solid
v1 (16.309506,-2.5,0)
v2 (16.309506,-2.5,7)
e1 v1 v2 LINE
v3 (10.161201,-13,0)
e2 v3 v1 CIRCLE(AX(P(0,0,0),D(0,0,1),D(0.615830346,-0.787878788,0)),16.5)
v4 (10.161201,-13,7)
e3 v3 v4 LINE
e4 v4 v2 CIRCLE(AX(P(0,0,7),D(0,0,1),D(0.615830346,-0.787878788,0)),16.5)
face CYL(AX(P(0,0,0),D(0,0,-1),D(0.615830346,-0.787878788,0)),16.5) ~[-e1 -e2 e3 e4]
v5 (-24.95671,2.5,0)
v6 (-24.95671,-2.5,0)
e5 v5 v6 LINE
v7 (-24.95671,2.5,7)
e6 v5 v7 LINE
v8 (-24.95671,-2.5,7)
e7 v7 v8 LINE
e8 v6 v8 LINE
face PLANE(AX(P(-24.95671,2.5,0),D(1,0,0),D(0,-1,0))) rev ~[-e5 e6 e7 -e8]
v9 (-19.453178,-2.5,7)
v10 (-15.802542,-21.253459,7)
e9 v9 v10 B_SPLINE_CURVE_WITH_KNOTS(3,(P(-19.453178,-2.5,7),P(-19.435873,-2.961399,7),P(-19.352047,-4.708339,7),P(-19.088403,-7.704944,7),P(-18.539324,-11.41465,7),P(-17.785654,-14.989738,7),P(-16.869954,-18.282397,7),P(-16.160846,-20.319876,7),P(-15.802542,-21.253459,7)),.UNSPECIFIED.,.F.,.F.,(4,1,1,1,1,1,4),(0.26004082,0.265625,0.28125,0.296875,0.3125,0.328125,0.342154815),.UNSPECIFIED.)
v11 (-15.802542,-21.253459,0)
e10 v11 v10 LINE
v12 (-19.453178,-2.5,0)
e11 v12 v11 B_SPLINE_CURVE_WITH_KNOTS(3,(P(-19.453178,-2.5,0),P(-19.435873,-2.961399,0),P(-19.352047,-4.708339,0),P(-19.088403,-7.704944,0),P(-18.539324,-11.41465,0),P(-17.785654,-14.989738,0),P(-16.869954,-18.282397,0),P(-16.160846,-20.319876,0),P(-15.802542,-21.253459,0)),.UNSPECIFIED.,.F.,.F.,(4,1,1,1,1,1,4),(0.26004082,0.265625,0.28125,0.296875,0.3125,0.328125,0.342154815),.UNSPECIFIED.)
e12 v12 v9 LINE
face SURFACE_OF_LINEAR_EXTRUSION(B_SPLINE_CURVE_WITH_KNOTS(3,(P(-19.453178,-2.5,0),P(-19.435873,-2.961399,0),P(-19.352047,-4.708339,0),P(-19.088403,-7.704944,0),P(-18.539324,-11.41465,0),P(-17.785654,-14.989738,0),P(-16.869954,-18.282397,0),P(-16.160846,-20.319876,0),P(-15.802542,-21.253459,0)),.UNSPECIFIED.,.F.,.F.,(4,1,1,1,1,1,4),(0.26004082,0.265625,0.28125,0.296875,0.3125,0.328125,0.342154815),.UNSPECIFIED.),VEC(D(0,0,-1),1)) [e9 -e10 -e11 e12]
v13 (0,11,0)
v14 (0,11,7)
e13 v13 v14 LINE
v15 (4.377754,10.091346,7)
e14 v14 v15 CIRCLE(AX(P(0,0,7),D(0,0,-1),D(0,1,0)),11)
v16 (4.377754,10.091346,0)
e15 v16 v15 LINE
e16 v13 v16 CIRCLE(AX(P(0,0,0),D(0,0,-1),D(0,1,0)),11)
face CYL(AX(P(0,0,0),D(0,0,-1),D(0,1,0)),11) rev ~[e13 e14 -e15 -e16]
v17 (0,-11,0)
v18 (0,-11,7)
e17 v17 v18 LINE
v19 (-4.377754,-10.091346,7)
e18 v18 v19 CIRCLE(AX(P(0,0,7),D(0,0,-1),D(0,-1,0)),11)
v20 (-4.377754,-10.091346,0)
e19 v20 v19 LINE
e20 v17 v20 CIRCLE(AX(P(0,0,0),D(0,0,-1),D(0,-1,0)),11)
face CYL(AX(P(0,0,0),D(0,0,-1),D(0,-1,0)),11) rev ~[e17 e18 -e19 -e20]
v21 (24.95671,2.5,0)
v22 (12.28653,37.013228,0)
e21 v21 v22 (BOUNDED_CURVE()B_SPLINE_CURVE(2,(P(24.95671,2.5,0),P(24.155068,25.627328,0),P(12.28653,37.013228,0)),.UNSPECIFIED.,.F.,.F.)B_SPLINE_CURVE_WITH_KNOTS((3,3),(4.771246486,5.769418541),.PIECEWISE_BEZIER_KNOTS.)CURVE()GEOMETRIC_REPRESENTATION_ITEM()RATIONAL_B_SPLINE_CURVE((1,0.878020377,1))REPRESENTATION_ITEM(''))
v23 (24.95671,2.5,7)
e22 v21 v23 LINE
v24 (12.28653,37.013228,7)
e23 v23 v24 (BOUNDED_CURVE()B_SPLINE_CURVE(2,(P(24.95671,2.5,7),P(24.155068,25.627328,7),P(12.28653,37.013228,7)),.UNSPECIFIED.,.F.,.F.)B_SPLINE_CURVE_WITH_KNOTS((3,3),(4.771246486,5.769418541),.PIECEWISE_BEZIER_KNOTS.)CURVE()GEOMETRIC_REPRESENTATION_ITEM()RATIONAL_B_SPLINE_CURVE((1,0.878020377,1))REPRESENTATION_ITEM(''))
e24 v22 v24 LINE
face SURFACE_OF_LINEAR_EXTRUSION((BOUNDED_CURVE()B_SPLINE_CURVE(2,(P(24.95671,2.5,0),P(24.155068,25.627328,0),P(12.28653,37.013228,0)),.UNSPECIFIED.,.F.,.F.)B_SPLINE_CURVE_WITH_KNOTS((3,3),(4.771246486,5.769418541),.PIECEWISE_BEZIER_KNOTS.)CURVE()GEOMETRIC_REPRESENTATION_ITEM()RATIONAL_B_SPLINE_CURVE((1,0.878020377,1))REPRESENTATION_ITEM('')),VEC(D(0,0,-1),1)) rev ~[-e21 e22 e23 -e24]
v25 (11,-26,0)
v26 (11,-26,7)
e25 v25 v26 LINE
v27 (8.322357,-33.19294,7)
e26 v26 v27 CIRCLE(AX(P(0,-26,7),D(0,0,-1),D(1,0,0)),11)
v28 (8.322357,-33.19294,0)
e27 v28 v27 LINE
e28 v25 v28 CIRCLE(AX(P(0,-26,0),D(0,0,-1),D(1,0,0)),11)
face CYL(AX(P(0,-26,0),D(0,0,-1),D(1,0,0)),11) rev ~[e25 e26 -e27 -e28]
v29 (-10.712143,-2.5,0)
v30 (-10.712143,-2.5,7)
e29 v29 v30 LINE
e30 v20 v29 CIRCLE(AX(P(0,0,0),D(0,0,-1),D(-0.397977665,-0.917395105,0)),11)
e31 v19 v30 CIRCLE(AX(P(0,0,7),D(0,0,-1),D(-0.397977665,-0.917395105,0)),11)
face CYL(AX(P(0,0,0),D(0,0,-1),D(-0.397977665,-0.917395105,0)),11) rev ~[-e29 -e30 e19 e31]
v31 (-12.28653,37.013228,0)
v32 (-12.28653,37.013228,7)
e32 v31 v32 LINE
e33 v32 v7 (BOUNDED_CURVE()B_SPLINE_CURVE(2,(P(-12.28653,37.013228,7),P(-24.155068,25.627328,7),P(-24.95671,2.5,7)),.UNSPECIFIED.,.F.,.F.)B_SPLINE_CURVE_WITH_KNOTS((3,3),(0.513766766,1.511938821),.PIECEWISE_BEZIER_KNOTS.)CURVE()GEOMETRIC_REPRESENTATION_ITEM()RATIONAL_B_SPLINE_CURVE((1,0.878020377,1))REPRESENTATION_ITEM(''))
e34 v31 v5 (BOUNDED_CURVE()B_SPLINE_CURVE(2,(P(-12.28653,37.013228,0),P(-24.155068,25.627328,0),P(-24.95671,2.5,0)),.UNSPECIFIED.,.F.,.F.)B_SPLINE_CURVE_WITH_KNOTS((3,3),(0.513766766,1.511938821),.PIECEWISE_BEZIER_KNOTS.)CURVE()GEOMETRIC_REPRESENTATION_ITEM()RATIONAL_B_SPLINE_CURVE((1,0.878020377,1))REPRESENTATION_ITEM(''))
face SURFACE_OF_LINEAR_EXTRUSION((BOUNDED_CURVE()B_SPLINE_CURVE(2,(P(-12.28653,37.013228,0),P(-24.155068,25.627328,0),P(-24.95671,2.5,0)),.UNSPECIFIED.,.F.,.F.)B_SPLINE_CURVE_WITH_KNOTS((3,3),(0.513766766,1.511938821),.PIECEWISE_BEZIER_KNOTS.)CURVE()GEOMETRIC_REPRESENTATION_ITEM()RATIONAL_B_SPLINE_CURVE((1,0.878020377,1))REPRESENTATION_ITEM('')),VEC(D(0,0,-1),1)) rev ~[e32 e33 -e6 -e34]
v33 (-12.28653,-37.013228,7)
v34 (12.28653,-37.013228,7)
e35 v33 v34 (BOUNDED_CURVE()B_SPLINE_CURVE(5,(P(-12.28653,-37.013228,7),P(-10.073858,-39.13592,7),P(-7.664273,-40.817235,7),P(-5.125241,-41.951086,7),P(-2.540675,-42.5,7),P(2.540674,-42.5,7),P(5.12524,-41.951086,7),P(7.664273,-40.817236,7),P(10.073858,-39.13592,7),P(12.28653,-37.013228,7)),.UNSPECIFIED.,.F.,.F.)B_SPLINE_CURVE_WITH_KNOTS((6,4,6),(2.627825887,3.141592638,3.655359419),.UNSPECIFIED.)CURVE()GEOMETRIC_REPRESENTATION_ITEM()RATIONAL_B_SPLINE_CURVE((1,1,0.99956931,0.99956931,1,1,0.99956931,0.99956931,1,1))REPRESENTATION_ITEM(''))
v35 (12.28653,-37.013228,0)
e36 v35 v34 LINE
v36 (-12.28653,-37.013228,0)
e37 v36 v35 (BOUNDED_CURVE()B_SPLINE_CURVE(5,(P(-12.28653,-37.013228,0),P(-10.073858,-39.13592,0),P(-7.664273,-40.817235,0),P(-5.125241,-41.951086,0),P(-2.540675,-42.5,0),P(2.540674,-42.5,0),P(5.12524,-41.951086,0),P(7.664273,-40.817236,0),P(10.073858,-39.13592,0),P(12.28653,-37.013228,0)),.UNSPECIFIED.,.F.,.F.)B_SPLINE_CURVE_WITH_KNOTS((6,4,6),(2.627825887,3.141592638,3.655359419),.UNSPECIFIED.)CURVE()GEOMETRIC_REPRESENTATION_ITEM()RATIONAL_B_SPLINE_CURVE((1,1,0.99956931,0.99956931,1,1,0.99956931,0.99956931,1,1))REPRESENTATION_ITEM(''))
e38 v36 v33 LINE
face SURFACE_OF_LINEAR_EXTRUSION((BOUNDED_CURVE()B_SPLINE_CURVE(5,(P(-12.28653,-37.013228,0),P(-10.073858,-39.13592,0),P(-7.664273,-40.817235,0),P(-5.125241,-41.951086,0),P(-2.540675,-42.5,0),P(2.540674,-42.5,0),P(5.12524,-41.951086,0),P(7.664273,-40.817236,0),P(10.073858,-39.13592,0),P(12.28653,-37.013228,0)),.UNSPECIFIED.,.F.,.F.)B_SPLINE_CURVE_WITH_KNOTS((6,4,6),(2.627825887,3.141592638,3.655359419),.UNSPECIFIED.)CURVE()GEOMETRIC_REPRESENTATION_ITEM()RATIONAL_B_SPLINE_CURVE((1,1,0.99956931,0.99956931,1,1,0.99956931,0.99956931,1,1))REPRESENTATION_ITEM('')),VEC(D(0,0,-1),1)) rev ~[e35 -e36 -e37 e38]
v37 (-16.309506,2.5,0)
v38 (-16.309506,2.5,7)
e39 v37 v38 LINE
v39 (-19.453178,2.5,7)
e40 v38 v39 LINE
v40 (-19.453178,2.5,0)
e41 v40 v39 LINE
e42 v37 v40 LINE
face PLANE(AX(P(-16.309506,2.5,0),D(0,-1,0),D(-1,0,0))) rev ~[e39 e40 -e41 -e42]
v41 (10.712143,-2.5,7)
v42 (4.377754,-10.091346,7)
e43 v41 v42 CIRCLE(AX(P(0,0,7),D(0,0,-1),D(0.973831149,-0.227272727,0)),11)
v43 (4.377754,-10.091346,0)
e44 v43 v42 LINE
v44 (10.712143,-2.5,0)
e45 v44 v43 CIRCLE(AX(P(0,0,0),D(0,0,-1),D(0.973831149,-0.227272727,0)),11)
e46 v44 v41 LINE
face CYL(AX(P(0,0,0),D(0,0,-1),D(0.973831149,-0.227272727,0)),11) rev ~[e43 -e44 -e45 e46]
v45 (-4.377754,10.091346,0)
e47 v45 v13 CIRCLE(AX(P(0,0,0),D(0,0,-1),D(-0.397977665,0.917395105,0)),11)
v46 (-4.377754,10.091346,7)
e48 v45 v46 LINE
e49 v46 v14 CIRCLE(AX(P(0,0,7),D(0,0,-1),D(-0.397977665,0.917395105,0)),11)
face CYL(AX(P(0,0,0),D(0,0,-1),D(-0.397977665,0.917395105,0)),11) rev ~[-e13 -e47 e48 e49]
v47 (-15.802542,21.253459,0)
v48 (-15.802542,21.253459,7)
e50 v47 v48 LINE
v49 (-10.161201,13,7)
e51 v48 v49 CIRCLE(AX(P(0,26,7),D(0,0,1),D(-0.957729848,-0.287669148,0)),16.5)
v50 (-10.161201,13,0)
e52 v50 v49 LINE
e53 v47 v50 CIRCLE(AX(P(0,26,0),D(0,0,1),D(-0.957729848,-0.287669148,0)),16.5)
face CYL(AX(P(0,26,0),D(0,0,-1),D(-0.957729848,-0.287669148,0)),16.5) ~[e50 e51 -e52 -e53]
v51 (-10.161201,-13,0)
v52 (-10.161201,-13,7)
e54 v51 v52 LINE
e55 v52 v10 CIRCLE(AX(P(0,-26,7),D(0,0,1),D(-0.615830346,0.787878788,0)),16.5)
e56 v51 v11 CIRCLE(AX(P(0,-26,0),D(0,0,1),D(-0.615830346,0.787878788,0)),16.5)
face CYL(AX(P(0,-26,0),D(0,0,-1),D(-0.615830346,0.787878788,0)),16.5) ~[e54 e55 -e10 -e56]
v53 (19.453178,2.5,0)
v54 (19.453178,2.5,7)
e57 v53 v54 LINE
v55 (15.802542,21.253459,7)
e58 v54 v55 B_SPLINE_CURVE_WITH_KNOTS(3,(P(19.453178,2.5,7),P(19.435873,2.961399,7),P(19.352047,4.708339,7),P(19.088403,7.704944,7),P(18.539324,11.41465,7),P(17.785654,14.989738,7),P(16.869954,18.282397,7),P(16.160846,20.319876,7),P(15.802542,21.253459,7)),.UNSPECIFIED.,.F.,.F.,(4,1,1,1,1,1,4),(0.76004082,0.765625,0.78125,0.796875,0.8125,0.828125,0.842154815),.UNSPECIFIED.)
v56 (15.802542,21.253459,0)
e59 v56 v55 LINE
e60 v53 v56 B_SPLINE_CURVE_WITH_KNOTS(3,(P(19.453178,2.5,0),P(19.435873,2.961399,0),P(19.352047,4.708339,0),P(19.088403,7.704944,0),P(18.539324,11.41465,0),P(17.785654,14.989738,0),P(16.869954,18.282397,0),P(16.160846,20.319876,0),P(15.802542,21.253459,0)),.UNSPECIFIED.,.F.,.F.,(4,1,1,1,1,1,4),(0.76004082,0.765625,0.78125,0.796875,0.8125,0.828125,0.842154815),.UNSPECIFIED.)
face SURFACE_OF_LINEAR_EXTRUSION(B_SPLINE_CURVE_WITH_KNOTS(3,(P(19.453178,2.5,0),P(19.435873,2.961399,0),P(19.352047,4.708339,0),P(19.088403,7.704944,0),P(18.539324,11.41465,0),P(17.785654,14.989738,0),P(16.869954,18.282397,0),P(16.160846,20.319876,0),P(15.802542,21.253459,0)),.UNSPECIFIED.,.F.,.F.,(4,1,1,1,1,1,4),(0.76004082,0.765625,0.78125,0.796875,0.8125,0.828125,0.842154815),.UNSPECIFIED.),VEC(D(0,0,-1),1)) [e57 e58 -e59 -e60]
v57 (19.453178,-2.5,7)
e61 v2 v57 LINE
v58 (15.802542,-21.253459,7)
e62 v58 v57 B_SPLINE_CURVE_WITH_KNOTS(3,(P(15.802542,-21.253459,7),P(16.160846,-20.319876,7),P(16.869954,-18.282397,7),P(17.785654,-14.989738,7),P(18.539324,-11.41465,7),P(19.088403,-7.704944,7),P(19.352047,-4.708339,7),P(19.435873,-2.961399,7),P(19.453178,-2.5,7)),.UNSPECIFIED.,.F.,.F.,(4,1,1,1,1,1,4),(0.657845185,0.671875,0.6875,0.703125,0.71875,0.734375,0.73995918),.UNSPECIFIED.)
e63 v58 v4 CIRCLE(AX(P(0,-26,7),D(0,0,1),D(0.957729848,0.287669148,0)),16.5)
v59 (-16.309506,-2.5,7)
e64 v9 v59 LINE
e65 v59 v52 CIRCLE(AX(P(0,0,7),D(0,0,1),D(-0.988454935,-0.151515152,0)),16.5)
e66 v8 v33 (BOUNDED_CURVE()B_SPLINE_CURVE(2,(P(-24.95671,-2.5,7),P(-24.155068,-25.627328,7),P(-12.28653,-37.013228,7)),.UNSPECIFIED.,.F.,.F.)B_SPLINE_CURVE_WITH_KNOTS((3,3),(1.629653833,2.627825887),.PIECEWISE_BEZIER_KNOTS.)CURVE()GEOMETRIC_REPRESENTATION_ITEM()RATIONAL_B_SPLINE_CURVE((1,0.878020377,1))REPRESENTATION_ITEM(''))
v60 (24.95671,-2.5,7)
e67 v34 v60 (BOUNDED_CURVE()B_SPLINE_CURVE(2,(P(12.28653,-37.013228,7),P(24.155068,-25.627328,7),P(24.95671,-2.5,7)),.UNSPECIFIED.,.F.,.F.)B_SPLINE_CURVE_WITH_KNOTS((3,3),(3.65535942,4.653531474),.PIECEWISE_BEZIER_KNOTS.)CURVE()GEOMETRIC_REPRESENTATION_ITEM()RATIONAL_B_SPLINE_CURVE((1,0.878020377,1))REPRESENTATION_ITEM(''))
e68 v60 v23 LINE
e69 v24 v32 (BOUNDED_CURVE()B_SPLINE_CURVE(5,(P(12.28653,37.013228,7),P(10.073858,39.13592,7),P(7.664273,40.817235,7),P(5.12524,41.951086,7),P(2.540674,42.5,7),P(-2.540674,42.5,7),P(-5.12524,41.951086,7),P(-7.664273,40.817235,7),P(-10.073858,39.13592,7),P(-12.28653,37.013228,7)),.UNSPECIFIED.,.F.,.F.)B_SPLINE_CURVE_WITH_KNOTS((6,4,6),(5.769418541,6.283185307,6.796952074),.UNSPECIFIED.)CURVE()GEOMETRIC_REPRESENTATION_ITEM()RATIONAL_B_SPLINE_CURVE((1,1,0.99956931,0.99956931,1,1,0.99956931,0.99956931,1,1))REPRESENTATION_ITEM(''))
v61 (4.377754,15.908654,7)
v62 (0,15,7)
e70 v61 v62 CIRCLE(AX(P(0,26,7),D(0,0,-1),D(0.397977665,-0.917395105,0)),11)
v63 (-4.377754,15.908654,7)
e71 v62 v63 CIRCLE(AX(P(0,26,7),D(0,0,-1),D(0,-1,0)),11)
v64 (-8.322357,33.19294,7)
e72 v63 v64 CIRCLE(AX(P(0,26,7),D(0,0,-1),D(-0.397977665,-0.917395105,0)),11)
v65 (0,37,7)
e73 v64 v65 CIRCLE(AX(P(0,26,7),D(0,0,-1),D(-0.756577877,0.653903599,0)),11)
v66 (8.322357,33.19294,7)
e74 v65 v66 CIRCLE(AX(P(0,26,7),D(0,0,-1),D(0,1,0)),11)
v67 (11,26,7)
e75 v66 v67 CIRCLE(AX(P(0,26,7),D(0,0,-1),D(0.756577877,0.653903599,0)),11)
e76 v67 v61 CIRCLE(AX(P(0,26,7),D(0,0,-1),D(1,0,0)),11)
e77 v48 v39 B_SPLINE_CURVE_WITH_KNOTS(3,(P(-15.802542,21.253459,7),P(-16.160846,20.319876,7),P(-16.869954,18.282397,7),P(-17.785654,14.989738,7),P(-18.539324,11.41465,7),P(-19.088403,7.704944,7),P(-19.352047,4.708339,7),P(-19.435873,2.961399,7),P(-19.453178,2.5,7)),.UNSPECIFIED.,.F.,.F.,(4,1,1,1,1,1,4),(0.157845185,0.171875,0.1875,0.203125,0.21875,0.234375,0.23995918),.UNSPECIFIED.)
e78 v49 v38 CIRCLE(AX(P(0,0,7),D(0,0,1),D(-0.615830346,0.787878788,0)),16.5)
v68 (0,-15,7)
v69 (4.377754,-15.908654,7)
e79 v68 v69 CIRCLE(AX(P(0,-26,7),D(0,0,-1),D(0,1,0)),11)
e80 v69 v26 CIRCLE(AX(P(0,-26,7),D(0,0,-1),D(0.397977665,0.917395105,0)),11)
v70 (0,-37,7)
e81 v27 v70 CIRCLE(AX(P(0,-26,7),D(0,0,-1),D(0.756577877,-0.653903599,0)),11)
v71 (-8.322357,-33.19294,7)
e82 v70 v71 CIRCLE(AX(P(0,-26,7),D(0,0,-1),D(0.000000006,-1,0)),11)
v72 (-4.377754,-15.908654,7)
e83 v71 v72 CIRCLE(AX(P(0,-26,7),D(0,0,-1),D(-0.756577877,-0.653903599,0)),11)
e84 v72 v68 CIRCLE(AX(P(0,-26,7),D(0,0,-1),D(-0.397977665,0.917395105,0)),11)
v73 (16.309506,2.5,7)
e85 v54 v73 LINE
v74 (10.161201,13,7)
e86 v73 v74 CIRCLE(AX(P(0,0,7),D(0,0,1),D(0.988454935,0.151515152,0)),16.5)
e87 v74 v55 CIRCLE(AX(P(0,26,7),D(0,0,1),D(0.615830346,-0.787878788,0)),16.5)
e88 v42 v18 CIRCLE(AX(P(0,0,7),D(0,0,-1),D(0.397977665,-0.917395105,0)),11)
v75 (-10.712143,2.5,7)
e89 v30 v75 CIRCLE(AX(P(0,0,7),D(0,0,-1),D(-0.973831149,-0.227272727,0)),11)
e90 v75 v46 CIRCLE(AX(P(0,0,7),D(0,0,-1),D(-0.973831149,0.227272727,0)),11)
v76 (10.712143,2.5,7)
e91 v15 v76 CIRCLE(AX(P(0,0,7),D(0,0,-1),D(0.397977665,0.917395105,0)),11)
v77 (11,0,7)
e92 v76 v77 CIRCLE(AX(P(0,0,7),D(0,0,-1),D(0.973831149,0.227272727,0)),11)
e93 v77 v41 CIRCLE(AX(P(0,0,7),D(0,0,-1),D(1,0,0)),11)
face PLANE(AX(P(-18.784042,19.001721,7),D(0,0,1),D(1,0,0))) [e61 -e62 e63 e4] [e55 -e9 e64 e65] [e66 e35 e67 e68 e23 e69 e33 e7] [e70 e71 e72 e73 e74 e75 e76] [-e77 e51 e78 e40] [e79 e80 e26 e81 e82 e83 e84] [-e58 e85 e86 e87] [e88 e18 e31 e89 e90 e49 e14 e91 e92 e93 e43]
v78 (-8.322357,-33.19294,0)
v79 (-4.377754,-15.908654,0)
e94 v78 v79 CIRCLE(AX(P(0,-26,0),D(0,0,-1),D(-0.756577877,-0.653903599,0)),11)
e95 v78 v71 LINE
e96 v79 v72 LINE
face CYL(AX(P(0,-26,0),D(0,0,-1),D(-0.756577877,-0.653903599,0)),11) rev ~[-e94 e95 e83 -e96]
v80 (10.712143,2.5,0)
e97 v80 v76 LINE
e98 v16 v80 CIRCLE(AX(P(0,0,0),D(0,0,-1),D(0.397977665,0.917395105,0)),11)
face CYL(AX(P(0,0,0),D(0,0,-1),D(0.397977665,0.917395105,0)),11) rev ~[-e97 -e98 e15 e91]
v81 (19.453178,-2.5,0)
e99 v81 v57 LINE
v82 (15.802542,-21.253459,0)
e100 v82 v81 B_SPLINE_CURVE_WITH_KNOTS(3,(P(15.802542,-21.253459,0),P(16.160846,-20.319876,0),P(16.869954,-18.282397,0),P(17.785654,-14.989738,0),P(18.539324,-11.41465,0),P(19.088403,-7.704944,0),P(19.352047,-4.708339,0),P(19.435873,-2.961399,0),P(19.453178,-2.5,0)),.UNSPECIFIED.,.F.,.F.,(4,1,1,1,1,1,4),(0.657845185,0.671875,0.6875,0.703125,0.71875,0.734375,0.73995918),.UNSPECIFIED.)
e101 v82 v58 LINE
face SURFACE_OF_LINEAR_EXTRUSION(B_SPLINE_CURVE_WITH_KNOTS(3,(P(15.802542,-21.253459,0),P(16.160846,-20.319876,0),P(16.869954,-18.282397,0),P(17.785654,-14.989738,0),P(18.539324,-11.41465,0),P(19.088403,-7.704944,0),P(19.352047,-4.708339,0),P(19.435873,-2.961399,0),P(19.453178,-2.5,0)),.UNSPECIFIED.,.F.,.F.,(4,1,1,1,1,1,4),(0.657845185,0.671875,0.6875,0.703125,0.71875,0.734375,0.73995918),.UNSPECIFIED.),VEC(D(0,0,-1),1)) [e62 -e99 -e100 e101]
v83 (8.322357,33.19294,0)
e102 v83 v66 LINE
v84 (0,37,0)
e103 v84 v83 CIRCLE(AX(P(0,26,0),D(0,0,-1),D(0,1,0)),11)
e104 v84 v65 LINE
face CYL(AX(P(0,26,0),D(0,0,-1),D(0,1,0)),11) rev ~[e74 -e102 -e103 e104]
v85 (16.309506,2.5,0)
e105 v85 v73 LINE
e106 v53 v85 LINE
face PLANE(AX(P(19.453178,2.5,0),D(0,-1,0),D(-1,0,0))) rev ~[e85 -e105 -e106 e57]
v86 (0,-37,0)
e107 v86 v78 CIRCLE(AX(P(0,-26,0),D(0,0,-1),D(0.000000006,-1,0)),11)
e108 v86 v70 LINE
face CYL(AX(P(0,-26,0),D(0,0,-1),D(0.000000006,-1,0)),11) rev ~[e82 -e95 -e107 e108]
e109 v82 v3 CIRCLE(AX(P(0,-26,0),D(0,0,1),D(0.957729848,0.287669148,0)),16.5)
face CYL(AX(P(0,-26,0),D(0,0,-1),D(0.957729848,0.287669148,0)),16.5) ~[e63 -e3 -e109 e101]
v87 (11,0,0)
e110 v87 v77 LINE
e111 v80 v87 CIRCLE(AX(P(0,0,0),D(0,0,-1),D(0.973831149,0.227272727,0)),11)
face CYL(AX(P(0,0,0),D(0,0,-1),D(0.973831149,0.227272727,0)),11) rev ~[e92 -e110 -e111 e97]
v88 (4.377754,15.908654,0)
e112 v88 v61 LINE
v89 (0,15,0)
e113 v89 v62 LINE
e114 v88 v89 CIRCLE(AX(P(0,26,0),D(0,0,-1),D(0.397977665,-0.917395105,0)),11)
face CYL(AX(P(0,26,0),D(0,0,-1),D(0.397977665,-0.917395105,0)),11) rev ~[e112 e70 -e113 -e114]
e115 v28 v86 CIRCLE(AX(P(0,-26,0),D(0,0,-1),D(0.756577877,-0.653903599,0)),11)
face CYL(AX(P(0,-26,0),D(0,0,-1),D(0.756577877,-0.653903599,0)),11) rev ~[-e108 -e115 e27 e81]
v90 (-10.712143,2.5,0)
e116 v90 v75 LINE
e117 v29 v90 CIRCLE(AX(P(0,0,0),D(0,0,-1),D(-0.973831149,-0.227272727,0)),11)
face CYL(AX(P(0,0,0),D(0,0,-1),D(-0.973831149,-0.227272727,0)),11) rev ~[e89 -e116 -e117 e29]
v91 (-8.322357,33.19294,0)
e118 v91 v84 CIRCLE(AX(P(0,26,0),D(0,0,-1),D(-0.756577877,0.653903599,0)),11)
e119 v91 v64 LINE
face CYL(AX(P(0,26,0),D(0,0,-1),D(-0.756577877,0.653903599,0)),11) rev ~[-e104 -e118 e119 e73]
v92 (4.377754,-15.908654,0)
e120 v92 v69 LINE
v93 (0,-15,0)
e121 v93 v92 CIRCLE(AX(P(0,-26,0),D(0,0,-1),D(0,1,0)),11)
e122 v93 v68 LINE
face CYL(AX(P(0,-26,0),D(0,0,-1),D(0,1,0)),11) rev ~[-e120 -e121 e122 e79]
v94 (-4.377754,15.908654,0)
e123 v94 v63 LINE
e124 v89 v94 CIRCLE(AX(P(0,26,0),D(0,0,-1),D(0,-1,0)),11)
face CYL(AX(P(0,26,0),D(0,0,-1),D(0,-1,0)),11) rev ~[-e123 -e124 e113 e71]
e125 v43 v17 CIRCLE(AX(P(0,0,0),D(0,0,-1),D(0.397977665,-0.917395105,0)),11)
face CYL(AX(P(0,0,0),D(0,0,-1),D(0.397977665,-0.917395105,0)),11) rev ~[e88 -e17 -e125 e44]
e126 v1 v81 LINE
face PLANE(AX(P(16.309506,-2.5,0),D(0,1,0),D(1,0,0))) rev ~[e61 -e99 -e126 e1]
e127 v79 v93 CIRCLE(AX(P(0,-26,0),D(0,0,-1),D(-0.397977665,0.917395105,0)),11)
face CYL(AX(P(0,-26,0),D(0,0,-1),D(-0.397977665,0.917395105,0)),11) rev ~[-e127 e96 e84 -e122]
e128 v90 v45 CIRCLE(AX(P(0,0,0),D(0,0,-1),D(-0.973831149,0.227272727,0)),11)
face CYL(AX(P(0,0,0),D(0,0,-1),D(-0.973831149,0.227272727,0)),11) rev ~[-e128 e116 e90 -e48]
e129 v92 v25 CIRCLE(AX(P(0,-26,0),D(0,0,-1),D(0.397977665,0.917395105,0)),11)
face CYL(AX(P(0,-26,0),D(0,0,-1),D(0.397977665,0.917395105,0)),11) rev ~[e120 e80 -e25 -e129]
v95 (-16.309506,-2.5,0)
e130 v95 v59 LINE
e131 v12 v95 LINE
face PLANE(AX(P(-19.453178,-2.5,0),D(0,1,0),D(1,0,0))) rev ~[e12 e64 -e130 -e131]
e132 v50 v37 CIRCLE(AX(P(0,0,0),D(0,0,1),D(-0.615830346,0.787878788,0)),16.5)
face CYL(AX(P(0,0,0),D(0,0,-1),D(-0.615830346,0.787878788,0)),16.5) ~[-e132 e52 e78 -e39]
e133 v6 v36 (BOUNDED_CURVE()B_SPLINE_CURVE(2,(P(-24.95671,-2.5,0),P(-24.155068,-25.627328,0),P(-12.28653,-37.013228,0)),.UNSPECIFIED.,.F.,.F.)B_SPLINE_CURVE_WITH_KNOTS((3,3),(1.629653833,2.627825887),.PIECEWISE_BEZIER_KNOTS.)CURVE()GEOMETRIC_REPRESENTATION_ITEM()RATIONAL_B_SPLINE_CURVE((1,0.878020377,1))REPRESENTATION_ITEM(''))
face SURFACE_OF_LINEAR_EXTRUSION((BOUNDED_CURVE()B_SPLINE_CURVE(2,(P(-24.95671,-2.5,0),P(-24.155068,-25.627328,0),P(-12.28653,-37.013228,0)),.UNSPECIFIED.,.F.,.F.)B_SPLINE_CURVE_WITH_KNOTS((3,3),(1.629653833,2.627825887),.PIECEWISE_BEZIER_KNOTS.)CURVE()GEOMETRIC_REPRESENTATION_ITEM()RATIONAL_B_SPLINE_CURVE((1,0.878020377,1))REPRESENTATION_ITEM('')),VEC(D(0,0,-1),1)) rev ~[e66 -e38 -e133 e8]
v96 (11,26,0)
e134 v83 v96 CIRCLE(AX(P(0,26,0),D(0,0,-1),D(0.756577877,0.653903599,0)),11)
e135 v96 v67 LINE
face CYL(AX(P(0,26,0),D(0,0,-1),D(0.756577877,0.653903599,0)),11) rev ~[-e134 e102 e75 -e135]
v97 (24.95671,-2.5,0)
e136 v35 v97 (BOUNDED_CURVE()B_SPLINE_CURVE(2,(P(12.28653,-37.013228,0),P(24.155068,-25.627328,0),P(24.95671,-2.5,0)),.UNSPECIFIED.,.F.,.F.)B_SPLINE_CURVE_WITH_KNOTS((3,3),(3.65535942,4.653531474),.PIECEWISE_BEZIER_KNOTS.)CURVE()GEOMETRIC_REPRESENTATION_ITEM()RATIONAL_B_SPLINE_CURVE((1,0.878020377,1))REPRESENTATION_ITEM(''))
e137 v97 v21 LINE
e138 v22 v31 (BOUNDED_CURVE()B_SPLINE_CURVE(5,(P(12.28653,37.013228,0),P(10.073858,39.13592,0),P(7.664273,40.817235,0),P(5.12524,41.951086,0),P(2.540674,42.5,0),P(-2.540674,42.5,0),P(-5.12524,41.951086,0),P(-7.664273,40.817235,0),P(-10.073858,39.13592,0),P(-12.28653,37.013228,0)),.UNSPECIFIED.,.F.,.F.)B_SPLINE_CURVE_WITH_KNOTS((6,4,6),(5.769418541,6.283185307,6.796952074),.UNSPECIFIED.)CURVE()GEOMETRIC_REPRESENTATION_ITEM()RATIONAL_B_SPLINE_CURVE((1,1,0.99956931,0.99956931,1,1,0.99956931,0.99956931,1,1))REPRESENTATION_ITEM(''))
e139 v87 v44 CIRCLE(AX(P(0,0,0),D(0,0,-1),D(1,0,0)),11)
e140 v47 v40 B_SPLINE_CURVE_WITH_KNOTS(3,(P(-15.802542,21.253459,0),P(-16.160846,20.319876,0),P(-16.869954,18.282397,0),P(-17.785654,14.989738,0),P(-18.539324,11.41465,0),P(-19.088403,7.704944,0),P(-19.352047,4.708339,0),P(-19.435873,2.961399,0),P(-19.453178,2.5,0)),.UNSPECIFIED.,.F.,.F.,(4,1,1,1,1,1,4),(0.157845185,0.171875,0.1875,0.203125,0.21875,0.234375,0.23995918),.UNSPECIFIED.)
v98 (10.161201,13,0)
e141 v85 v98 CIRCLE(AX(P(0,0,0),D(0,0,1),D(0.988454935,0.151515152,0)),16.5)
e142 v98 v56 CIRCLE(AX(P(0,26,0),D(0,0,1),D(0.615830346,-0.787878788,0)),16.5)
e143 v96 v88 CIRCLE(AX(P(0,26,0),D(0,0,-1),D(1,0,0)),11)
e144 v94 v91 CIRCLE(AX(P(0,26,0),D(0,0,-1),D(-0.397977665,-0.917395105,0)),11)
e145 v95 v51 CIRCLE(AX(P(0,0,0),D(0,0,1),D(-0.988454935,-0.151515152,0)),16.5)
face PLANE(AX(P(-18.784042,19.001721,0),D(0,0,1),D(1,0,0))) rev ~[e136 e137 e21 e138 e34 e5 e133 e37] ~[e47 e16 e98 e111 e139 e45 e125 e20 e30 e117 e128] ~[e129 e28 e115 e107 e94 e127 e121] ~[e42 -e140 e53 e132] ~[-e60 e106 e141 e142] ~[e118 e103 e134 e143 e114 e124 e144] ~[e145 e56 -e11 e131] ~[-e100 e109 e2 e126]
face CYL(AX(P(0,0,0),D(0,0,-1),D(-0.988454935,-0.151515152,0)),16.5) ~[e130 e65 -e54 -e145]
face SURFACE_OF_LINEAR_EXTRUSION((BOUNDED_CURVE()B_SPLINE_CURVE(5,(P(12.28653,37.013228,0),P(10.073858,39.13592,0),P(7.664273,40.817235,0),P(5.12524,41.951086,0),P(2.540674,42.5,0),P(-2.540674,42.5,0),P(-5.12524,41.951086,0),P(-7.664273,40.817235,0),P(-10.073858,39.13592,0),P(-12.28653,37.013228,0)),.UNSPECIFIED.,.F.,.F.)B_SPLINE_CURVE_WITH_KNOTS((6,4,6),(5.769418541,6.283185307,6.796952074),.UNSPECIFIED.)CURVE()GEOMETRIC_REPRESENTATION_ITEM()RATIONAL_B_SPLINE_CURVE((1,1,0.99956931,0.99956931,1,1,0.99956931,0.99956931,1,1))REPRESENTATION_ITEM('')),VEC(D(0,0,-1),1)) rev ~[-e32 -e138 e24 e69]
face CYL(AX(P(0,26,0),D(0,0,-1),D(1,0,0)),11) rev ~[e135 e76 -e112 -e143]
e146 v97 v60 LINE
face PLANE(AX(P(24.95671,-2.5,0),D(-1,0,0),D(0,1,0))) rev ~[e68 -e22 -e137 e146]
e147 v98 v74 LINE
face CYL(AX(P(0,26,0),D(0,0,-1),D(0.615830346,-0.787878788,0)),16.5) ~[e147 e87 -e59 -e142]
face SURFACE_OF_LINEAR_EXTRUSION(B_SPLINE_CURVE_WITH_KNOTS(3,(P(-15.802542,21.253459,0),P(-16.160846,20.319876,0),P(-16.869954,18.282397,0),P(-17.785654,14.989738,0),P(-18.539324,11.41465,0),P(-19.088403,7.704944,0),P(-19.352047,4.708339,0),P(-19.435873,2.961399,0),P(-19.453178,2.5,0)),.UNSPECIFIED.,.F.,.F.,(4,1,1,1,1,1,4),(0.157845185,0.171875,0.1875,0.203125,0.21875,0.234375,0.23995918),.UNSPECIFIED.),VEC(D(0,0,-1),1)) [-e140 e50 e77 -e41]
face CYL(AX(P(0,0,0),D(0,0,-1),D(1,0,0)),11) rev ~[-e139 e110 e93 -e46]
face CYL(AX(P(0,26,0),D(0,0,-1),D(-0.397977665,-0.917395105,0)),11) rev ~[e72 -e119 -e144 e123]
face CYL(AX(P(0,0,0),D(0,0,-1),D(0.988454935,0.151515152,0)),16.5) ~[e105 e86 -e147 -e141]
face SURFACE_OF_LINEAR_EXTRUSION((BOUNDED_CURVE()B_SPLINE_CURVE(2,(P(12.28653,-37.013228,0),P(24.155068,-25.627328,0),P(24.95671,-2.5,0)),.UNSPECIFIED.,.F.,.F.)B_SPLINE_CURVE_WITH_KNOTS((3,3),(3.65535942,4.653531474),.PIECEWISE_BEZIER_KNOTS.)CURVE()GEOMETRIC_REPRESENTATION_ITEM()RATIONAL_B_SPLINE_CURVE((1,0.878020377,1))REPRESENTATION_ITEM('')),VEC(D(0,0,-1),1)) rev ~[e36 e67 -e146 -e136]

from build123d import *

# Parameters (mm, degrees)
F1_DEPTH = 7


# Not quite as in the source:
# - the dataset's text gives a spline's control points without its knots; the knots are read off the source's solid


with BuildPart() as f1:
    # F0 (on Top) → F1 (new body)
    with BuildSketch(Plane.XY):
        with BuildLine():
            add(Edge.make_bspline(
                [(-12.2865300122, 37.0132275132), (-24.155068252, 25.6273275114), (-24.9567099242, 2.5)],
                knots=[0.5137667663, 0.5137667663, 0.5137667663, 1.5119388208, 1.5119388208, 1.5119388208], degree=2, weights=[1, 0.8780203772, 1]))
            Line((-24.9567099242, 2.5), (-19.453178151, 2.5))
            add(Edge.make_bspline(
                [(-15.8025424867, 21.2534590537), (-16.1608457903, 20.3198762687), (-16.869953541, 18.2823971156), (-17.7856543458, 14.9897380208), (-18.5393237245, 11.414650213), (-19.0884029155, 7.7049435305), (-19.352047015, 4.7083391393), (-19.4358731607, 2.9613993071), (-19.453178151, 2.5)],
                knots=[0.157845185, 0.157845185, 0.157845185, 0.157845185, 0.171875, 0.1875, 0.203125, 0.21875, 0.234375, 0.2399591803, 0.2399591803, 0.2399591803, 0.2399591803], degree=3))
            ThreePointArc((-15.8025424867, 21.2534590537), (-16.1040856287, 29.5928298126), (-12.2865300122, 37.0132275132))
        make_face()
        with BuildLine():
            Line((-19.453178151, 2.5), (-24.9567099242, 2.5))
            Line((-24.9567099242, 2.5), (-24.9567099242, -2.5))
            Line((-24.9567099242, -2.5), (-19.453178151, -2.5))
            add(Edge.make_bspline(
                [(-19.453178151, 2.5), (-19.4600835604, 2.3158825262), (-19.4877799652, 1.485210562), (-19.5095080905, 0), (-19.4877799652, -1.485210562), (-19.4600835604, -2.3158825262), (-19.453178151, -2.5)],
                knots=[0.2399591803, 0.2399591803, 0.2399591803, 0.2399591803, 0.2421875, 0.25, 0.2578125, 0.2600408197, 0.2600408197, 0.2600408197, 0.2600408197], degree=3))
        make_face()
        with BuildLine():
            Line((-19.453178151, -2.5), (-24.9567099242, -2.5))
            add(Edge.make_bspline(
                [(-24.9567099242, -2.5), (-24.155068252, -25.6273275114), (-12.2865300122, -37.0132275132)],
                knots=[1.6296538327, 1.6296538327, 1.6296538327, 2.6278258872, 2.6278258872, 2.6278258872], degree=2, weights=[1, 0.8780203772, 1]))
            ThreePointArc((-12.2865300122, -37.0132275132), (-16.1040856287, -29.5928298126), (-15.8025424867, -21.2534590537))
            add(Edge.make_bspline(
                [(-19.453178151, -2.5), (-19.4358731607, -2.9613993071), (-19.352047015, -4.7083391393), (-19.0884029155, -7.7049435305), (-18.5393237245, -11.414650213), (-17.7856543458, -14.9897380208), (-16.869953541, -18.2823971156), (-16.1608457903, -20.3198762687), (-15.8025424867, -21.2534590537)],
                knots=[0.2600408197, 0.2600408197, 0.2600408197, 0.2600408197, 0.265625, 0.28125, 0.296875, 0.3125, 0.328125, 0.342154815, 0.342154815, 0.342154815, 0.342154815], degree=3))
        make_face()
        with BuildLine():
            add(Edge.make_bspline(
                [(0, 42.5), (-6.5671780891, 42.5), (-12.2865300122, 37.0132275132)],
                knots=[0, 0, 0, 0.5137667663, 0.5137667663, 0.5137667663], degree=2, weights=[1, 0.967186505, 1]))
            ThreePointArc((-12.2865300122, 37.0132275132), (-16.1040856287, 29.5928298126), (-15.8025424867, 21.2534590537))
            add(Edge.make_bspline(
                [(-8.3223566434, 33.1929395869), (-8.7992109435, 32.7452255263), (-9.831903457, 31.6798268662), (-11.1152962392, 30.0683455079), (-12.1705625375, 28.5237462249), (-12.9418479396, 27.2765788333), (-13.6842337818, 25.9505034679), (-14.6253408369, 24.0934250391), (-15.3188374514, 22.5012494774), (-15.7618035271, 21.3596070883), (-15.8025424867, 21.2534590537)],
                knots=[0.0804159275, 0.0804159275, 0.0804159275, 0.0804159275, 0.09375, 0.109375, 0.1171875, 0.125, 0.1328125, 0.140625, 0.15625, 0.157845185, 0.157845185, 0.157845185, 0.157845185], degree=3))
            ThreePointArc((-8.3223566434, 33.1929395869), (-4.5758968817, 36.0030579189), (0, 37))
            ThreePointArc((0, 37), (4.5758968817, 36.0030579189), (8.3223566434, 33.1929395869))
            add(Edge.make_bspline(
                [(15.8025424867, 21.2534590537), (15.7618035271, 21.3596070883), (15.3188374514, 22.5012494774), (14.6253408369, 24.0934250391), (13.6842337818, 25.9505034679), (12.9418479396, 27.2765788333), (12.1705625375, 28.5237462249), (11.1152962392, 30.0683455079), (9.831903457, 31.6798268662), (8.7992109435, 32.7452255263), (8.3223566434, 33.1929395869)],
                knots=[0.842154815, 0.842154815, 0.842154815, 0.842154815, 0.84375, 0.859375, 0.8671875, 0.875, 0.8828125, 0.890625, 0.90625, 0.9195840725, 0.9195840725, 0.9195840725, 0.9195840725], degree=3))
            ThreePointArc((15.8025424867, 21.2534590537), (16.3247044542, 23.6012452221), (16.5, 26))
            ThreePointArc((16.5, 26), (15.4106739827, 31.8958567994), (12.2865300122, 37.0132275132))
            add(Edge.make_bspline(
                [(12.2865300122, 37.0132275132), (6.5671780891, 42.5), (0, 42.5)],
                knots=[5.7694185408, 5.7694185408, 5.7694185408, 6.2831853072, 6.2831853072, 6.2831853072], degree=2, weights=[1, 0.967186505, 1]))
        make_face()
        with BuildLine():
            Line((-16.3095064303, 2.5), (-19.453178151, 2.5))
            add(Edge.make_bspline(
                [(-19.453178151, 2.5), (-19.4600835604, 2.3158825262), (-19.4877799652, 1.485210562), (-19.5095080905, 0), (-19.4877799652, -1.485210562), (-19.4600835604, -2.3158825262), (-19.453178151, -2.5)],
                knots=[0.2399591803, 0.2399591803, 0.2399591803, 0.2399591803, 0.2421875, 0.25, 0.2578125, 0.2600408197, 0.2600408197, 0.2600408197, 0.2600408197], degree=3))
            Line((-19.453178151, -2.5), (-16.3095064303, -2.5))
            ThreePointArc((-16.3095064303, -2.5), (-16.5, 0), (-16.3095064303, 2.5))
        make_face()
        with BuildLine():
            ThreePointArc((-15.8025424867, -21.2534590537), (-16.1040856287, -29.5928298126), (-12.2865300122, -37.0132275132))
            add(Edge.make_bspline(
                [(-12.2865300122, -37.0132275132), (-6.5671782692, -42.4999998273), (-3.868e-07, -42.5)],
                knots=[2.6278258872, 2.6278258872, 2.6278258872, 3.1415926381, 3.1415926381, 3.1415926381], degree=2, weights=[1, 0.967186507, 1]))
            add(Edge.make_bspline(
                [(-3.868e-07, -42.5), (6.5671779091, -42.5000001727), (12.2865300122, -37.0132275132)],
                knots=[3.1415926381, 3.1415926381, 3.1415926381, 3.6553594199, 3.6553594199, 3.6553594199], degree=2, weights=[1, 0.967186503, 1]))
            ThreePointArc((12.2865300122, -37.0132275132), (15.4106739827, -31.8958567994), (16.5, -26))
            ThreePointArc((16.5, -26), (16.3247044542, -23.6012452221), (15.8025424867, -21.2534590537))
            add(Edge.make_bspline(
                [(8.3223566434, -33.1929395869), (8.7992109435, -32.7452255263), (9.831903457, -31.6798268662), (11.1152962392, -30.0683455079), (12.1705625375, -28.5237462249), (12.9418479396, -27.2765788333), (13.6842337818, -25.9505034679), (14.6253408369, -24.0934250391), (15.3188374514, -22.5012494774), (15.7618035271, -21.3596070883), (15.8025424867, -21.2534590537)],
                knots=[0.5804159275, 0.5804159275, 0.5804159275, 0.5804159275, 0.59375, 0.609375, 0.6171875, 0.625, 0.6328125, 0.640625, 0.65625, 0.657845185, 0.657845185, 0.657845185, 0.657845185], degree=3))
            ThreePointArc((8.3223566434, -33.1929395869), (4.5758969132, -36.0030579045), (6.92e-08, -37))
            ThreePointArc((6.92e-08, -37), (-4.5758968503, -36.0030579332), (-8.3223566434, -33.1929395869))
            add(Edge.make_bspline(
                [(-15.8025424867, -21.2534590537), (-15.7618035271, -21.3596070883), (-15.3188374514, -22.5012494774), (-14.6253408369, -24.0934250391), (-13.6842337818, -25.9505034679), (-12.9418479396, -27.2765788333), (-12.1705625375, -28.5237462249), (-11.1152962392, -30.0683455079), (-9.831903457, -31.6798268662), (-8.7992109435, -32.7452255263), (-8.3223566434, -33.1929395869)],
                knots=[0.342154815, 0.342154815, 0.342154815, 0.342154815, 0.34375, 0.359375, 0.3671875, 0.375, 0.3828125, 0.390625, 0.40625, 0.4195840725, 0.4195840725, 0.4195840725, 0.4195840725], degree=3))
        make_face()
        with BuildLine():
            add(Edge.make_bspline(
                [(-8.3223566434, 33.1929395869), (-8.7992109435, 32.7452255263), (-9.831903457, 31.6798268662), (-11.1152962392, 30.0683455079), (-12.1705625375, 28.5237462249), (-12.9418479396, 27.2765788333), (-13.6842337818, 25.9505034679), (-14.6253408369, 24.0934250391), (-15.3188374514, 22.5012494774), (-15.7618035271, 21.3596070883), (-15.8025424867, 21.2534590537)],
                knots=[0.0804159275, 0.0804159275, 0.0804159275, 0.0804159275, 0.09375, 0.109375, 0.1171875, 0.125, 0.1328125, 0.140625, 0.15625, 0.157845185, 0.157845185, 0.157845185, 0.157845185], degree=3))
            ThreePointArc((-15.8025424867, 21.2534590537), (-13.6220001053, 16.6891937443), (-10.1612007165, 13))
            ThreePointArc((-10.1612007165, 13), (-7.4135261595, 14.7407472633), (-4.3777543105, 15.9086538462))
            ThreePointArc((-4.3777543105, 15.9086538462), (-10.7242639818, 23.5525192446), (-8.3223566434, 33.1929395869))
        make_face()
        with BuildLine():
            Line((-10.7121426428, 2.5), (-16.3095064303, 2.5))
            ThreePointArc((-16.3095064303, 2.5), (-16.5, 0), (-16.3095064303, -2.5))
            Line((-16.3095064303, -2.5), (-10.7121426428, -2.5))
            ThreePointArc((-10.7121426428, -2.5), (-11, 0), (-10.7121426428, 2.5))
        make_face()
        with BuildLine():
            ThreePointArc((-10.1612007165, 13), (-14.238577324, 8.3374406018), (-16.3095064303, 2.5))
            Line((-16.3095064303, 2.5), (-10.7121426428, 2.5))
            ThreePointArc((-10.7121426428, 2.5), (-8.4459091649, 7.0474547446), (-4.3777543105, 10.0913461538))
            ThreePointArc((-4.3777543105, 10.0913461538), (-7.4135261595, 11.2592527367), (-10.1612007165, 13))
        make_face()
        with BuildLine():
            ThreePointArc((-10.1612007165, -13), (-13.6220001053, -16.6891937443), (-15.8025424867, -21.2534590537))
            add(Edge.make_bspline(
                [(-15.8025424867, -21.2534590537), (-15.7618035271, -21.3596070883), (-15.3188374514, -22.5012494774), (-14.6253408369, -24.0934250391), (-13.6842337818, -25.9505034679), (-12.9418479396, -27.2765788333), (-12.1705625375, -28.5237462249), (-11.1152962392, -30.0683455079), (-9.831903457, -31.6798268662), (-8.7992109435, -32.7452255263), (-8.3223566434, -33.1929395869)],
                knots=[0.342154815, 0.342154815, 0.342154815, 0.342154815, 0.34375, 0.359375, 0.3671875, 0.375, 0.3828125, 0.390625, 0.40625, 0.4195840725, 0.4195840725, 0.4195840725, 0.4195840725], degree=3))
            ThreePointArc((-8.3223566434, -33.1929395869), (-10.7242639818, -23.5525192446), (-4.3777543105, -15.9086538462))
            ThreePointArc((-4.3777543105, -15.9086538462), (-7.4135261595, -14.7407472633), (-10.1612007165, -13))
        make_face()
        with BuildLine():
            Line((-10.7121426428, -2.5), (-16.3095064303, -2.5))
            ThreePointArc((-16.3095064303, -2.5), (-14.238577324, -8.3374406018), (-10.1612007165, -13))
            ThreePointArc((-10.1612007165, -13), (-7.4135261595, -11.2592527367), (-4.3777543105, -10.0913461538))
            ThreePointArc((-4.3777543105, -10.0913461538), (-8.4459091649, -7.0474547446), (-10.7121426428, -2.5))
        make_face()
        with BuildLine():
            add(Edge.make_bspline(
                [(24.9567099242, 2.5), (24.155068252, 25.6273275114), (12.2865300122, 37.0132275132)],
                knots=[4.7712464863, 4.7712464863, 4.7712464863, 5.7694185408, 5.7694185408, 5.7694185408], degree=2, weights=[1, 0.8780203772, 1]))
            ThreePointArc((12.2865300122, 37.0132275132), (15.4106739827, 31.8958567994), (16.5, 26))
            ThreePointArc((16.5, 26), (16.3247044542, 23.6012452221), (15.8025424867, 21.2534590537))
            add(Edge.make_bspline(
                [(19.453178151, 2.5), (19.4358731607, 2.9613993071), (19.352047015, 4.7083391393), (19.0884029155, 7.7049435305), (18.5393237245, 11.414650213), (17.7856543458, 14.9897380208), (16.869953541, 18.2823971156), (16.1608457903, 20.3198762687), (15.8025424867, 21.2534590537)],
                knots=[0.7600408197, 0.7600408197, 0.7600408197, 0.7600408197, 0.765625, 0.78125, 0.796875, 0.8125, 0.828125, 0.842154815, 0.842154815, 0.842154815, 0.842154815], degree=3))
            Line((19.453178151, 2.5), (24.9567099242, 2.5))
        make_face()
        with BuildLine():
            ThreePointArc((-4.3777543105, 15.9086538462), (-7.4135261595, 14.7407472633), (-10.1612007165, 13))
            ThreePointArc((-10.1612007165, 13), (-7.4135261595, 11.2592527367), (-4.3777543105, 10.0913461538))
            ThreePointArc((-4.3777543105, 10.0913461538), (-2.2355303965, 10.7704412094), (0, 11))
            Line((0, 11), (0, 15))
            ThreePointArc((0, 15), (-2.2355303965, 15.2295587906), (-4.3777543105, 15.9086538462))
        make_face()
        with BuildLine():
            ThreePointArc((16.5, -26), (15.4106739827, -31.8958567994), (12.2865300122, -37.0132275132))
            add(Edge.make_bspline(
                [(12.2865300122, -37.0132275132), (24.155068252, -25.6273275114), (24.9567099242, -2.5)],
                knots=[3.6553594199, 3.6553594199, 3.6553594199, 4.6535314744, 4.6535314744, 4.6535314744], degree=2, weights=[1, 0.8780203772, 1]))
            Line((24.9567099242, -2.5), (19.453178151, -2.5))
            add(Edge.make_bspline(
                [(15.8025424867, -21.2534590537), (16.1608457903, -20.3198762687), (16.869953541, -18.2823971156), (17.7856543458, -14.9897380208), (18.5393237245, -11.414650213), (19.0884029155, -7.7049435305), (19.352047015, -4.7083391393), (19.4358731607, -2.9613993071), (19.453178151, -2.5)],
                knots=[0.657845185, 0.657845185, 0.657845185, 0.657845185, 0.671875, 0.6875, 0.703125, 0.71875, 0.734375, 0.7399591803, 0.7399591803, 0.7399591803, 0.7399591803], degree=3))
            ThreePointArc((15.8025424867, -21.2534590537), (16.3247044542, -23.6012452221), (16.5, -26))
        make_face()
        with BuildLine():
            ThreePointArc((-4.3777543105, -10.0913461538), (-7.4135261595, -11.2592527367), (-10.1612007165, -13))
            ThreePointArc((-10.1612007165, -13), (-7.4135261595, -14.7407472633), (-4.3777543105, -15.9086538462))
            ThreePointArc((-4.3777543105, -15.9086538462), (-2.2355303965, -15.2295587906), (0, -15))
            Line((0, -15), (0, -11))
            ThreePointArc((0, -11), (-2.2355303965, -10.7704412094), (-4.3777543105, -10.0913461538))
        make_face()
        with BuildLine():
            Line((24.9567099242, -2.5), (24.9567099242, 2.5))
            Line((24.9567099242, 2.5), (19.453178151, 2.5))
            add(Edge.make_bspline(
                [(19.453178151, -2.5), (19.4600835604, -2.3158825262), (19.4877799652, -1.485210562), (19.5095080905, 0), (19.4877799652, 1.485210562), (19.4600835604, 2.3158825262), (19.453178151, 2.5)],
                knots=[0.7399591803, 0.7399591803, 0.7399591803, 0.7399591803, 0.7421875, 0.75, 0.7578125, 0.7600408197, 0.7600408197, 0.7600408197, 0.7600408197], degree=3))
            Line((19.453178151, -2.5), (24.9567099242, -2.5))
        make_face()
        with BuildLine():
            add(Edge.make_bspline(
                [(19.453178151, -2.5), (19.4600835604, -2.3158825262), (19.4877799652, -1.485210562), (19.5095080905, 0), (19.4877799652, 1.485210562), (19.4600835604, 2.3158825262), (19.453178151, 2.5)],
                knots=[0.7399591803, 0.7399591803, 0.7399591803, 0.7399591803, 0.7421875, 0.75, 0.7578125, 0.7600408197, 0.7600408197, 0.7600408197, 0.7600408197], degree=3))
            Line((19.453178151, 2.5), (16.3095064303, 2.5))
            ThreePointArc((16.3095064303, 2.5), (16.4523076816, 1.253623528), (16.5, 0))
            ThreePointArc((16.5, 0), (16.4523076816, -1.253623528), (16.3095064303, -2.5))
            Line((16.3095064303, -2.5), (19.453178151, -2.5))
        make_face()
        with BuildLine():
            ThreePointArc((10.1612007165, 13), (13.6220001053, 16.6891937443), (15.8025424867, 21.2534590537))
            add(Edge.make_bspline(
                [(15.8025424867, 21.2534590537), (15.7618035271, 21.3596070883), (15.3188374514, 22.5012494774), (14.6253408369, 24.0934250391), (13.6842337818, 25.9505034679), (12.9418479396, 27.2765788333), (12.1705625375, 28.5237462249), (11.1152962392, 30.0683455079), (9.831903457, 31.6798268662), (8.7992109435, 32.7452255263), (8.3223566434, 33.1929395869)],
                knots=[0.842154815, 0.842154815, 0.842154815, 0.842154815, 0.84375, 0.859375, 0.8671875, 0.875, 0.8828125, 0.890625, 0.90625, 0.9195840725, 0.9195840725, 0.9195840725, 0.9195840725], degree=3))
            ThreePointArc((8.3223566434, 33.1929395869), (10.3088778021, 29.8375823719), (11, 26))
            ThreePointArc((11, 26), (9.1966107185, 19.9649066874), (4.3777543105, 15.9086538462))
            ThreePointArc((4.3777543105, 15.9086538462), (7.4135261595, 14.7407472633), (10.1612007165, 13))
        make_face()
        with BuildLine():
            ThreePointArc((4.3777543105, 15.9086538462), (2.2355303965, 15.2295587906), (0, 15))
            Line((0, 15), (0, 11))
            ThreePointArc((0, 11), (2.2355303965, 10.7704412094), (4.3777543105, 10.0913461538))
            ThreePointArc((4.3777543105, 10.0913461538), (7.4135261595, 11.2592527367), (10.1612007165, 13))
            ThreePointArc((10.1612007165, 13), (7.4135261595, 14.7407472633), (4.3777543105, 15.9086538462))
        make_face()
        with BuildLine():
            Line((16.3095064303, 2.5), (10.7121426428, 2.5))
            ThreePointArc((10.7121426428, 2.5), (10.9277987049, 1.258258902), (11, 0))
            ThreePointArc((11, 0), (10.9277987049, -1.258258902), (10.7121426428, -2.5))
            Line((10.7121426428, -2.5), (16.3095064303, -2.5))
            ThreePointArc((16.3095064303, -2.5), (16.4523076816, -1.253623528), (16.5, 0))
            ThreePointArc((16.5, 0), (16.4523076816, 1.253623528), (16.3095064303, 2.5))
        make_face()
        with BuildLine():
            ThreePointArc((4.3777543105, 10.0913461538), (8.4459091649, 7.0474547446), (10.7121426428, 2.5))
            Line((10.7121426428, 2.5), (16.3095064303, 2.5))
            ThreePointArc((16.3095064303, 2.5), (14.238577324, 8.3374406018), (10.1612007165, 13))
            ThreePointArc((10.1612007165, 13), (7.4135261595, 11.2592527367), (4.3777543105, 10.0913461538))
        make_face()
        with BuildLine():
            add(Edge.make_bspline(
                [(8.3223566434, -33.1929395869), (8.7992109435, -32.7452255263), (9.831903457, -31.6798268662), (11.1152962392, -30.0683455079), (12.1705625375, -28.5237462249), (12.9418479396, -27.2765788333), (13.6842337818, -25.9505034679), (14.6253408369, -24.0934250391), (15.3188374514, -22.5012494774), (15.7618035271, -21.3596070883), (15.8025424867, -21.2534590537)],
                knots=[0.5804159275, 0.5804159275, 0.5804159275, 0.5804159275, 0.59375, 0.609375, 0.6171875, 0.625, 0.6328125, 0.640625, 0.65625, 0.657845185, 0.657845185, 0.657845185, 0.657845185], degree=3))
            ThreePointArc((15.8025424867, -21.2534590537), (13.6220001053, -16.6891937443), (10.1612007165, -13))
            ThreePointArc((10.1612007165, -13), (7.4135261595, -14.7407472633), (4.3777543105, -15.9086538462))
            ThreePointArc((4.3777543105, -15.9086538462), (9.1966107185, -19.9649066874), (11, -26))
            ThreePointArc((11, -26), (10.3088778021, -29.8375823719), (8.3223566434, -33.1929395869))
        make_face()
        with BuildLine():
            Line((0, -11), (0, -15))
            ThreePointArc((0, -15), (2.2355303965, -15.2295587906), (4.3777543105, -15.9086538462))
            ThreePointArc((4.3777543105, -15.9086538462), (7.4135261595, -14.7407472633), (10.1612007165, -13))
            ThreePointArc((10.1612007165, -13), (7.4135261595, -11.2592527367), (4.3777543105, -10.0913461538))
            ThreePointArc((4.3777543105, -10.0913461538), (2.2355303965, -10.7704412094), (0, -11))
        make_face()
        with BuildLine():
            Line((16.3095064303, -2.5), (10.7121426428, -2.5))
            ThreePointArc((10.7121426428, -2.5), (8.4459091649, -7.0474547446), (4.3777543105, -10.0913461538))
            ThreePointArc((4.3777543105, -10.0913461538), (7.4135261595, -11.2592527367), (10.1612007165, -13))
            ThreePointArc((10.1612007165, -13), (14.238577324, -8.3374406018), (16.3095064303, -2.5))
        make_face()
    extrude(amount=F1_DEPTH)


solid = f1.part
